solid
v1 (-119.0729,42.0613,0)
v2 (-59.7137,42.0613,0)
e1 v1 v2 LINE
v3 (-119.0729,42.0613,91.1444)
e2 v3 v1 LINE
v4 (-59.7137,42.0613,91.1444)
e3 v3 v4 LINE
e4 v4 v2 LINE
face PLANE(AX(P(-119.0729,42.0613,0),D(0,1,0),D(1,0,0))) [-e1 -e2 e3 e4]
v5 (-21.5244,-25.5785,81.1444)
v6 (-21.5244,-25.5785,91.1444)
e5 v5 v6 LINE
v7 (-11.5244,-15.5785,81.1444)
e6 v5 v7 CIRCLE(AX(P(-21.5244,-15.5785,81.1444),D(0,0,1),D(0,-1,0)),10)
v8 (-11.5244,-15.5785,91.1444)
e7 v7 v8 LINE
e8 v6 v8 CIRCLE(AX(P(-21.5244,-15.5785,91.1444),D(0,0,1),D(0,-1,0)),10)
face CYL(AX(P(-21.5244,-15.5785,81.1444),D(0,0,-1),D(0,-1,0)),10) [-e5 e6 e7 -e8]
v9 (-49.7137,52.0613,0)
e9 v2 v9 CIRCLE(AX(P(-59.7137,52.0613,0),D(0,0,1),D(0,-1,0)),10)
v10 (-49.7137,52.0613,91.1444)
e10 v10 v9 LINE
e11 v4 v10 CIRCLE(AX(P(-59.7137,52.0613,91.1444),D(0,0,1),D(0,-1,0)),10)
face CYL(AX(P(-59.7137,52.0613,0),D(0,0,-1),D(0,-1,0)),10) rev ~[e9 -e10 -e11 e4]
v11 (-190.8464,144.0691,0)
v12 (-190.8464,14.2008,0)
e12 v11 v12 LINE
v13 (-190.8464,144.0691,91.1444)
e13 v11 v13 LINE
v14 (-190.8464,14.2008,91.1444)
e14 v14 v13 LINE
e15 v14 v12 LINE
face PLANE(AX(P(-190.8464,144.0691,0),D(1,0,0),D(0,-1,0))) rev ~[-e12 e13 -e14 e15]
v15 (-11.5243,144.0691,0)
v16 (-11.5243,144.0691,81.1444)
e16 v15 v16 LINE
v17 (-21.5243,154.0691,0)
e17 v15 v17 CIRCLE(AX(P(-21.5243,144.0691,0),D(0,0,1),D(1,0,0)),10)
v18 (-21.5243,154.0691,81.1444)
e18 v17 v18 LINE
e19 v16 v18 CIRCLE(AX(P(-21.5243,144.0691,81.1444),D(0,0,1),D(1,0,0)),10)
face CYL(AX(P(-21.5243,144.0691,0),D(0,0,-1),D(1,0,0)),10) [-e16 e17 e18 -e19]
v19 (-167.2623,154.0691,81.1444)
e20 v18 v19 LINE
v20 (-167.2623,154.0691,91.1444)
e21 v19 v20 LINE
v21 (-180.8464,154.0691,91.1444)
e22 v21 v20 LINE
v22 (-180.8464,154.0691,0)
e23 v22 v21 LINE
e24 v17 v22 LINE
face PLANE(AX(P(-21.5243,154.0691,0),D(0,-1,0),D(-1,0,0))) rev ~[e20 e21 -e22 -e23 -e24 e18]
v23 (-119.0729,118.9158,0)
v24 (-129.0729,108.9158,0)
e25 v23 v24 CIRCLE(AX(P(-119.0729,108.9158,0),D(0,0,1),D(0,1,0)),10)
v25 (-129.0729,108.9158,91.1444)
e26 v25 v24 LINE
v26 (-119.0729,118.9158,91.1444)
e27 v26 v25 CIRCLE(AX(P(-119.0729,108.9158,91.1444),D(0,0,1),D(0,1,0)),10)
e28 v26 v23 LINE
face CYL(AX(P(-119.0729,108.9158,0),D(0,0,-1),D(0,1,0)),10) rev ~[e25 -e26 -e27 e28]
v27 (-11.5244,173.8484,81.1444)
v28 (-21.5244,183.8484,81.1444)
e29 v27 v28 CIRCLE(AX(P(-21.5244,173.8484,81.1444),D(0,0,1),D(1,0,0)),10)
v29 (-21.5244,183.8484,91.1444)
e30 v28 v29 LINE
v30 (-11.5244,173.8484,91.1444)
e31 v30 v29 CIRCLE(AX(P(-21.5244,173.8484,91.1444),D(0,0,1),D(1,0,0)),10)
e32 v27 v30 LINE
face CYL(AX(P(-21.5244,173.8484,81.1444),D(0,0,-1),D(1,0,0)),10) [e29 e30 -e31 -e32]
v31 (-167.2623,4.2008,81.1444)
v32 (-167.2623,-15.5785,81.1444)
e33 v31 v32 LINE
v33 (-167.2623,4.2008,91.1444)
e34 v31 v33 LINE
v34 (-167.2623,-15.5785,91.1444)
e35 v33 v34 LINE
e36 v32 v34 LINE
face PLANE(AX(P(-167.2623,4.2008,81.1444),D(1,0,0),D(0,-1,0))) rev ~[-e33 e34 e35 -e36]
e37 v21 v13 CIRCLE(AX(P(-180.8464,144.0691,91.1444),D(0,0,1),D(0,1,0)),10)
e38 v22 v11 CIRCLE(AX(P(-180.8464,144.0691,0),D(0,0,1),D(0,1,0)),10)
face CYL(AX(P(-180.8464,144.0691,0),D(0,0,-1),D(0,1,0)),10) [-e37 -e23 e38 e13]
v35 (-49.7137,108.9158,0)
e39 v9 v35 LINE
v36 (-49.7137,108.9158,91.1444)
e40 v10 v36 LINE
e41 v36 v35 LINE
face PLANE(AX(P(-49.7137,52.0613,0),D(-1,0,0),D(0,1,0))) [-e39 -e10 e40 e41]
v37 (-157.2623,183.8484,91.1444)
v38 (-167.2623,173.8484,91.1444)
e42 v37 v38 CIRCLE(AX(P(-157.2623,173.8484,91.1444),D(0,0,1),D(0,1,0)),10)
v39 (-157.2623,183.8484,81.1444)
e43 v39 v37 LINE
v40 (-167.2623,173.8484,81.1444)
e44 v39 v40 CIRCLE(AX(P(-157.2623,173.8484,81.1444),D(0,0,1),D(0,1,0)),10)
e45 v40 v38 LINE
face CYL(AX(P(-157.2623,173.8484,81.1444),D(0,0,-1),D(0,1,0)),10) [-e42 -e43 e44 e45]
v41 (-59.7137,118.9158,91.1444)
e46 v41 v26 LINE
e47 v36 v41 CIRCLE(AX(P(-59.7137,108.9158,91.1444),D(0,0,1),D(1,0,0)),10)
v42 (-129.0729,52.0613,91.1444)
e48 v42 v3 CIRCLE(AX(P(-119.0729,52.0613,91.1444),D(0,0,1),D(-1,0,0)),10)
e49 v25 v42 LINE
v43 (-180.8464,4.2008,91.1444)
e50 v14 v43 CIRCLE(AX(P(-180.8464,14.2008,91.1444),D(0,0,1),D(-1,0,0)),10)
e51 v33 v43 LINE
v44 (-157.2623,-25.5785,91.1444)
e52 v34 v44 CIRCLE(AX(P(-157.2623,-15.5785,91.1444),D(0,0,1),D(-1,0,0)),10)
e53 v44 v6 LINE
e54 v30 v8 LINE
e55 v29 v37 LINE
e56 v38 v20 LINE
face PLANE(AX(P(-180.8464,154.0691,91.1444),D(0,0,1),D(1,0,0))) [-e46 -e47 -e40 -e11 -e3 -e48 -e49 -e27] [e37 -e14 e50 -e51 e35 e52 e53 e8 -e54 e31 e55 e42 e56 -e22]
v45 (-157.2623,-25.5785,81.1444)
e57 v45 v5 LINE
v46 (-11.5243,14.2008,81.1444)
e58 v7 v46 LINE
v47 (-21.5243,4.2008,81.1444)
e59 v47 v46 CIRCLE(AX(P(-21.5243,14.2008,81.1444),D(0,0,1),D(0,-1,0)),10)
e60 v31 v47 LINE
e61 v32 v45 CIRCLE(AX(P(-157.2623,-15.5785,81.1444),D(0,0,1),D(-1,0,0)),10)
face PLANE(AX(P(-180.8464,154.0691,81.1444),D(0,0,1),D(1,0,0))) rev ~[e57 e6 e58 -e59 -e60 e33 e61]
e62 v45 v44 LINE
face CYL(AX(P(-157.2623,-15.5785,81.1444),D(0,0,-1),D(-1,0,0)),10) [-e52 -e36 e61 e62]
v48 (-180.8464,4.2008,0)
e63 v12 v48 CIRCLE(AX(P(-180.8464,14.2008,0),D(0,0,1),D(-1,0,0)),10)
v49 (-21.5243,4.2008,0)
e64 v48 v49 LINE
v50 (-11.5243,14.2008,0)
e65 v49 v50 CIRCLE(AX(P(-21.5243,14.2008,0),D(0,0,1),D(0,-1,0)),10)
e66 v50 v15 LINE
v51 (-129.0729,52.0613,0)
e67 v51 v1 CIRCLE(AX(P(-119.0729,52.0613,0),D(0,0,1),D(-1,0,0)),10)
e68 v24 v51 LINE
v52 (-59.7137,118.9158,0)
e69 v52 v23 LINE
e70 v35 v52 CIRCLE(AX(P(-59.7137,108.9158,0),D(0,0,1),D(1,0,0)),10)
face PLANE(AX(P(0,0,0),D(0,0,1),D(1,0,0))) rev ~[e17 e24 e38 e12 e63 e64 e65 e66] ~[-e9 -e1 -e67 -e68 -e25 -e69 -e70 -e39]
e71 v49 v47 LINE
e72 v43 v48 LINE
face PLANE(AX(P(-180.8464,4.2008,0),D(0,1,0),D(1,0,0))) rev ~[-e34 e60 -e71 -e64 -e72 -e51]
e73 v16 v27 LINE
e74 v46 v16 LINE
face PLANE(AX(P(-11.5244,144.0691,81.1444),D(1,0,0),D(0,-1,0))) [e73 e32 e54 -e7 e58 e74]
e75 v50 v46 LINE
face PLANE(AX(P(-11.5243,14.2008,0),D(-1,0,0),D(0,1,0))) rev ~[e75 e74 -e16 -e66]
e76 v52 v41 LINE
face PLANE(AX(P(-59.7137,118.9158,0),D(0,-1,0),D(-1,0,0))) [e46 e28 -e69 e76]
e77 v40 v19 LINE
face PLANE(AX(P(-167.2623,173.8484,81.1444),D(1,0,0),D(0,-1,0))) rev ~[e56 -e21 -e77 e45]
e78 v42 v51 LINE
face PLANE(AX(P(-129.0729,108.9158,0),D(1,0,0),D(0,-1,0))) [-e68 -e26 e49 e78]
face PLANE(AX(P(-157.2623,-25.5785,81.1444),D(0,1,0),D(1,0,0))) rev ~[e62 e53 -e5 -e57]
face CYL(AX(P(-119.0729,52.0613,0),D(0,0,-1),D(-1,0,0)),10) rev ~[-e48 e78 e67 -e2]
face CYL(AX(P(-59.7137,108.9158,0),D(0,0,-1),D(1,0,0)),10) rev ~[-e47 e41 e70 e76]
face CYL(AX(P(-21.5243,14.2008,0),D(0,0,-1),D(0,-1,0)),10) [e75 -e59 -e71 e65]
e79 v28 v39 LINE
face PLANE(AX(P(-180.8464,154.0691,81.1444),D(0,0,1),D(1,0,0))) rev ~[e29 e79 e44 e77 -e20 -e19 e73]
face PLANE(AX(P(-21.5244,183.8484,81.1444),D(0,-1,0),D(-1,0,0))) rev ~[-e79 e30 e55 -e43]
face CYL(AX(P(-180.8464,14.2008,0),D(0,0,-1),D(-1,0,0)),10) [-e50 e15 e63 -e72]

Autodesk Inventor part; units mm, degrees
ref_plane "YZ Plane" through (0, 0, 0) normal (1, 0, 0) x (0, 1, 0)
ref_plane "XZ Plane" through (0, 0, 0) normal (0, 1, 0) x (-1, 0, 0)
ref_plane "XY Plane" through (0, 0, 0) normal (0, 0, 1) x (1, 0, 0)
ref_plane "Work Plane1" through (0, 0, 0) normal (0, 0, 1) x (1, 0, 0)
sketch "Sketch1" plane through (0, 0, 0) normal (0, 0, 1) x (1, 0, 0)
  line L0 (-199.8571, 167.3322) -> (-0.3512, 153.2823) projected
  line L1 (-199.8571, 167.3322) -> (-212.6962, -14.9789) projected
  line L2 (-204.4935, -14.4012) -> (-212.6962, -14.9789) projected
  arc A0 (-204.4935, -14.4012) -> (-199.8571, -9.0623) centre (-204.8448, -9.4136) ccw projected
  line L3 (-0.3512, 4.9876) -> (-199.8571, -9.0623) projected
  line L4 (-0.3512, 4.9876) -> (-5.573, 79.1349) projected
  line L5 (-0.3512, 153.2823) -> (-5.573, 79.1349) projected
  line L6 (-21.5243, 154.0691) -> (-180.8464, 154.0691)
  line L7 (-190.8464, 144.0691) -> (-190.8464, 14.2008)
  line L8 (-180.8464, 4.2008) -> (-21.5243, 4.2008)
  line L9 (-11.5243, 14.2008) -> (-11.5243, 144.0691)
  circle A1 centre (-89.3933, 80.4886) radius 30.8095 projected
  line L10 (-59.7137, 118.9158) -> (-119.0729, 118.9158)
  line L11 (-129.0729, 108.9158) -> (-129.0729, 52.0613)
  line L12 (-119.0729, 42.0613) -> (-59.7137, 42.0613)
  line L13 (-49.7137, 52.0613) -> (-49.7137, 108.9158)
  line L14 (-49.7137, 118.9158) -> (-129.0729, 42.0613) construction
  line L15 (-129.0729, 118.9158) -> (-49.7137, 42.0613) construction
  arc A2 (-49.7137, 108.9158) -> (-59.7137, 118.9158) centre (-59.7137, 108.9158) ccw
  arc A3 (-59.7137, 42.0613) -> (-49.7137, 52.0613) centre (-59.7137, 52.0613) ccw
  arc A4 (-129.0729, 52.0613) -> (-119.0729, 42.0613) centre (-119.0729, 52.0613) ccw
  arc A5 (-119.0729, 118.9158) -> (-129.0729, 108.9158) centre (-119.0729, 108.9158) ccw
  arc A6 (-11.5243, 144.0691) -> (-21.5243, 154.0691) centre (-21.5243, 144.0691) ccw
  arc A7 (-21.5243, 4.2008) -> (-11.5243, 14.2008) centre (-21.5243, 14.2008) ccw
  arc A8 (-190.8464, 14.2008) -> (-180.8464, 4.2008) centre (-180.8464, 14.2008) ccw
  arc A9 (-180.8464, 154.0691) -> (-190.8464, 144.0691) centre (-180.8464, 144.0691) ccw
  point P0 (0, 0)
  point P1 (-11.5243, 154.0691)
  point P2 (-11.5243, 4.2008)
  dimension "d0" = 10
extrude "Extrusion1" add sketch "Sketch1" along normal up to surface (81.1444 mm away) contours A6 L9 A7 L8 A8 L7 A9 L6
sketch "Sketch2" plane through (-180.8464, 154.0691, 81.1444) normal (0, 0, 1) x (1, 0, 0)
  arc A0 (121.1327, -112.0078) -> (131.1327, -102.0078) centre (121.1327, -102.0078) ccw projected
  line L0 (61.7735, -112.0078) -> (121.1327, -112.0078) projected
  arc A1 (51.7735, -102.0078) -> (61.7735, -112.0078) centre (61.7735, -102.0078) ccw projected
  line L1 (51.7735, -45.1533) -> (51.7735, -102.0078) projected
  arc A2 (61.7735, -35.1533) -> (51.7735, -45.1533) centre (61.7735, -45.1533) ccw projected
  line L2 (121.1327, -35.1533) -> (61.7735, -35.1533) projected
  arc A3 (131.1327, -45.1533) -> (121.1327, -35.1533) centre (121.1327, -45.1533) ccw projected
  line L3 (131.1327, -102.0078) -> (131.1327, -45.1533) projected
  arc A4 (159.322, -149.8683) -> (169.322, -139.8683) centre (159.322, -139.8683) ccw projected
  line L4 (169.322, -10) -> (169.322, -139.8683) projected
  arc A5 (169.322, -10) -> (159.322, 0) centre (159.322, -10) ccw projected
  line L5 (0, 0) -> (159.322, 0) projected
  arc A6 (0, 0) -> (-10, -10) centre (0, -10) ccw projected
  line L6 (-10, -139.8683) -> (-10, -10) projected
  arc A7 (-10, -139.8683) -> (0, -149.8683) centre (0, -139.8683) ccw projected
  line L7 (159.322, -149.8683) -> (0, -149.8683) projected
  line L8 (23.5841, -179.6476) -> (159.322, -179.6476)
  line L9 (169.322, -169.6476) -> (169.322, 19.7793)
  line L10 (159.322, 29.7793) -> (23.5841, 29.7793)
  line L11 (13.5841, 19.7793) -> (13.5841, -169.6476)
  line L12 (13.5841, -179.6476) -> (169.322, 29.7793) construction
  line L13 (169.322, -179.6476) -> (13.5841, 29.7793) construction
  arc A8 (169.322, 19.7793) -> (159.322, 29.7793) centre (159.322, 19.7793) ccw
  arc A9 (23.5841, 29.7793) -> (13.5841, 19.7793) centre (23.5841, 19.7793) ccw
  arc A10 (13.5841, -169.6476) -> (23.5841, -179.6476) centre (23.5841, -169.6476) ccw
  arc A11 (159.322, -179.6476) -> (169.322, -169.6476) centre (159.322, -169.6476) ccw
  point P0 (180.8464, -154.0691)
  point P1 (91.4531, -74.9342)
  dimension "d3" = 10
extrude "Extrusion2" add sketch "Sketch2" along normal blind 10
properties part number "00_Axiovert_focusblock"
